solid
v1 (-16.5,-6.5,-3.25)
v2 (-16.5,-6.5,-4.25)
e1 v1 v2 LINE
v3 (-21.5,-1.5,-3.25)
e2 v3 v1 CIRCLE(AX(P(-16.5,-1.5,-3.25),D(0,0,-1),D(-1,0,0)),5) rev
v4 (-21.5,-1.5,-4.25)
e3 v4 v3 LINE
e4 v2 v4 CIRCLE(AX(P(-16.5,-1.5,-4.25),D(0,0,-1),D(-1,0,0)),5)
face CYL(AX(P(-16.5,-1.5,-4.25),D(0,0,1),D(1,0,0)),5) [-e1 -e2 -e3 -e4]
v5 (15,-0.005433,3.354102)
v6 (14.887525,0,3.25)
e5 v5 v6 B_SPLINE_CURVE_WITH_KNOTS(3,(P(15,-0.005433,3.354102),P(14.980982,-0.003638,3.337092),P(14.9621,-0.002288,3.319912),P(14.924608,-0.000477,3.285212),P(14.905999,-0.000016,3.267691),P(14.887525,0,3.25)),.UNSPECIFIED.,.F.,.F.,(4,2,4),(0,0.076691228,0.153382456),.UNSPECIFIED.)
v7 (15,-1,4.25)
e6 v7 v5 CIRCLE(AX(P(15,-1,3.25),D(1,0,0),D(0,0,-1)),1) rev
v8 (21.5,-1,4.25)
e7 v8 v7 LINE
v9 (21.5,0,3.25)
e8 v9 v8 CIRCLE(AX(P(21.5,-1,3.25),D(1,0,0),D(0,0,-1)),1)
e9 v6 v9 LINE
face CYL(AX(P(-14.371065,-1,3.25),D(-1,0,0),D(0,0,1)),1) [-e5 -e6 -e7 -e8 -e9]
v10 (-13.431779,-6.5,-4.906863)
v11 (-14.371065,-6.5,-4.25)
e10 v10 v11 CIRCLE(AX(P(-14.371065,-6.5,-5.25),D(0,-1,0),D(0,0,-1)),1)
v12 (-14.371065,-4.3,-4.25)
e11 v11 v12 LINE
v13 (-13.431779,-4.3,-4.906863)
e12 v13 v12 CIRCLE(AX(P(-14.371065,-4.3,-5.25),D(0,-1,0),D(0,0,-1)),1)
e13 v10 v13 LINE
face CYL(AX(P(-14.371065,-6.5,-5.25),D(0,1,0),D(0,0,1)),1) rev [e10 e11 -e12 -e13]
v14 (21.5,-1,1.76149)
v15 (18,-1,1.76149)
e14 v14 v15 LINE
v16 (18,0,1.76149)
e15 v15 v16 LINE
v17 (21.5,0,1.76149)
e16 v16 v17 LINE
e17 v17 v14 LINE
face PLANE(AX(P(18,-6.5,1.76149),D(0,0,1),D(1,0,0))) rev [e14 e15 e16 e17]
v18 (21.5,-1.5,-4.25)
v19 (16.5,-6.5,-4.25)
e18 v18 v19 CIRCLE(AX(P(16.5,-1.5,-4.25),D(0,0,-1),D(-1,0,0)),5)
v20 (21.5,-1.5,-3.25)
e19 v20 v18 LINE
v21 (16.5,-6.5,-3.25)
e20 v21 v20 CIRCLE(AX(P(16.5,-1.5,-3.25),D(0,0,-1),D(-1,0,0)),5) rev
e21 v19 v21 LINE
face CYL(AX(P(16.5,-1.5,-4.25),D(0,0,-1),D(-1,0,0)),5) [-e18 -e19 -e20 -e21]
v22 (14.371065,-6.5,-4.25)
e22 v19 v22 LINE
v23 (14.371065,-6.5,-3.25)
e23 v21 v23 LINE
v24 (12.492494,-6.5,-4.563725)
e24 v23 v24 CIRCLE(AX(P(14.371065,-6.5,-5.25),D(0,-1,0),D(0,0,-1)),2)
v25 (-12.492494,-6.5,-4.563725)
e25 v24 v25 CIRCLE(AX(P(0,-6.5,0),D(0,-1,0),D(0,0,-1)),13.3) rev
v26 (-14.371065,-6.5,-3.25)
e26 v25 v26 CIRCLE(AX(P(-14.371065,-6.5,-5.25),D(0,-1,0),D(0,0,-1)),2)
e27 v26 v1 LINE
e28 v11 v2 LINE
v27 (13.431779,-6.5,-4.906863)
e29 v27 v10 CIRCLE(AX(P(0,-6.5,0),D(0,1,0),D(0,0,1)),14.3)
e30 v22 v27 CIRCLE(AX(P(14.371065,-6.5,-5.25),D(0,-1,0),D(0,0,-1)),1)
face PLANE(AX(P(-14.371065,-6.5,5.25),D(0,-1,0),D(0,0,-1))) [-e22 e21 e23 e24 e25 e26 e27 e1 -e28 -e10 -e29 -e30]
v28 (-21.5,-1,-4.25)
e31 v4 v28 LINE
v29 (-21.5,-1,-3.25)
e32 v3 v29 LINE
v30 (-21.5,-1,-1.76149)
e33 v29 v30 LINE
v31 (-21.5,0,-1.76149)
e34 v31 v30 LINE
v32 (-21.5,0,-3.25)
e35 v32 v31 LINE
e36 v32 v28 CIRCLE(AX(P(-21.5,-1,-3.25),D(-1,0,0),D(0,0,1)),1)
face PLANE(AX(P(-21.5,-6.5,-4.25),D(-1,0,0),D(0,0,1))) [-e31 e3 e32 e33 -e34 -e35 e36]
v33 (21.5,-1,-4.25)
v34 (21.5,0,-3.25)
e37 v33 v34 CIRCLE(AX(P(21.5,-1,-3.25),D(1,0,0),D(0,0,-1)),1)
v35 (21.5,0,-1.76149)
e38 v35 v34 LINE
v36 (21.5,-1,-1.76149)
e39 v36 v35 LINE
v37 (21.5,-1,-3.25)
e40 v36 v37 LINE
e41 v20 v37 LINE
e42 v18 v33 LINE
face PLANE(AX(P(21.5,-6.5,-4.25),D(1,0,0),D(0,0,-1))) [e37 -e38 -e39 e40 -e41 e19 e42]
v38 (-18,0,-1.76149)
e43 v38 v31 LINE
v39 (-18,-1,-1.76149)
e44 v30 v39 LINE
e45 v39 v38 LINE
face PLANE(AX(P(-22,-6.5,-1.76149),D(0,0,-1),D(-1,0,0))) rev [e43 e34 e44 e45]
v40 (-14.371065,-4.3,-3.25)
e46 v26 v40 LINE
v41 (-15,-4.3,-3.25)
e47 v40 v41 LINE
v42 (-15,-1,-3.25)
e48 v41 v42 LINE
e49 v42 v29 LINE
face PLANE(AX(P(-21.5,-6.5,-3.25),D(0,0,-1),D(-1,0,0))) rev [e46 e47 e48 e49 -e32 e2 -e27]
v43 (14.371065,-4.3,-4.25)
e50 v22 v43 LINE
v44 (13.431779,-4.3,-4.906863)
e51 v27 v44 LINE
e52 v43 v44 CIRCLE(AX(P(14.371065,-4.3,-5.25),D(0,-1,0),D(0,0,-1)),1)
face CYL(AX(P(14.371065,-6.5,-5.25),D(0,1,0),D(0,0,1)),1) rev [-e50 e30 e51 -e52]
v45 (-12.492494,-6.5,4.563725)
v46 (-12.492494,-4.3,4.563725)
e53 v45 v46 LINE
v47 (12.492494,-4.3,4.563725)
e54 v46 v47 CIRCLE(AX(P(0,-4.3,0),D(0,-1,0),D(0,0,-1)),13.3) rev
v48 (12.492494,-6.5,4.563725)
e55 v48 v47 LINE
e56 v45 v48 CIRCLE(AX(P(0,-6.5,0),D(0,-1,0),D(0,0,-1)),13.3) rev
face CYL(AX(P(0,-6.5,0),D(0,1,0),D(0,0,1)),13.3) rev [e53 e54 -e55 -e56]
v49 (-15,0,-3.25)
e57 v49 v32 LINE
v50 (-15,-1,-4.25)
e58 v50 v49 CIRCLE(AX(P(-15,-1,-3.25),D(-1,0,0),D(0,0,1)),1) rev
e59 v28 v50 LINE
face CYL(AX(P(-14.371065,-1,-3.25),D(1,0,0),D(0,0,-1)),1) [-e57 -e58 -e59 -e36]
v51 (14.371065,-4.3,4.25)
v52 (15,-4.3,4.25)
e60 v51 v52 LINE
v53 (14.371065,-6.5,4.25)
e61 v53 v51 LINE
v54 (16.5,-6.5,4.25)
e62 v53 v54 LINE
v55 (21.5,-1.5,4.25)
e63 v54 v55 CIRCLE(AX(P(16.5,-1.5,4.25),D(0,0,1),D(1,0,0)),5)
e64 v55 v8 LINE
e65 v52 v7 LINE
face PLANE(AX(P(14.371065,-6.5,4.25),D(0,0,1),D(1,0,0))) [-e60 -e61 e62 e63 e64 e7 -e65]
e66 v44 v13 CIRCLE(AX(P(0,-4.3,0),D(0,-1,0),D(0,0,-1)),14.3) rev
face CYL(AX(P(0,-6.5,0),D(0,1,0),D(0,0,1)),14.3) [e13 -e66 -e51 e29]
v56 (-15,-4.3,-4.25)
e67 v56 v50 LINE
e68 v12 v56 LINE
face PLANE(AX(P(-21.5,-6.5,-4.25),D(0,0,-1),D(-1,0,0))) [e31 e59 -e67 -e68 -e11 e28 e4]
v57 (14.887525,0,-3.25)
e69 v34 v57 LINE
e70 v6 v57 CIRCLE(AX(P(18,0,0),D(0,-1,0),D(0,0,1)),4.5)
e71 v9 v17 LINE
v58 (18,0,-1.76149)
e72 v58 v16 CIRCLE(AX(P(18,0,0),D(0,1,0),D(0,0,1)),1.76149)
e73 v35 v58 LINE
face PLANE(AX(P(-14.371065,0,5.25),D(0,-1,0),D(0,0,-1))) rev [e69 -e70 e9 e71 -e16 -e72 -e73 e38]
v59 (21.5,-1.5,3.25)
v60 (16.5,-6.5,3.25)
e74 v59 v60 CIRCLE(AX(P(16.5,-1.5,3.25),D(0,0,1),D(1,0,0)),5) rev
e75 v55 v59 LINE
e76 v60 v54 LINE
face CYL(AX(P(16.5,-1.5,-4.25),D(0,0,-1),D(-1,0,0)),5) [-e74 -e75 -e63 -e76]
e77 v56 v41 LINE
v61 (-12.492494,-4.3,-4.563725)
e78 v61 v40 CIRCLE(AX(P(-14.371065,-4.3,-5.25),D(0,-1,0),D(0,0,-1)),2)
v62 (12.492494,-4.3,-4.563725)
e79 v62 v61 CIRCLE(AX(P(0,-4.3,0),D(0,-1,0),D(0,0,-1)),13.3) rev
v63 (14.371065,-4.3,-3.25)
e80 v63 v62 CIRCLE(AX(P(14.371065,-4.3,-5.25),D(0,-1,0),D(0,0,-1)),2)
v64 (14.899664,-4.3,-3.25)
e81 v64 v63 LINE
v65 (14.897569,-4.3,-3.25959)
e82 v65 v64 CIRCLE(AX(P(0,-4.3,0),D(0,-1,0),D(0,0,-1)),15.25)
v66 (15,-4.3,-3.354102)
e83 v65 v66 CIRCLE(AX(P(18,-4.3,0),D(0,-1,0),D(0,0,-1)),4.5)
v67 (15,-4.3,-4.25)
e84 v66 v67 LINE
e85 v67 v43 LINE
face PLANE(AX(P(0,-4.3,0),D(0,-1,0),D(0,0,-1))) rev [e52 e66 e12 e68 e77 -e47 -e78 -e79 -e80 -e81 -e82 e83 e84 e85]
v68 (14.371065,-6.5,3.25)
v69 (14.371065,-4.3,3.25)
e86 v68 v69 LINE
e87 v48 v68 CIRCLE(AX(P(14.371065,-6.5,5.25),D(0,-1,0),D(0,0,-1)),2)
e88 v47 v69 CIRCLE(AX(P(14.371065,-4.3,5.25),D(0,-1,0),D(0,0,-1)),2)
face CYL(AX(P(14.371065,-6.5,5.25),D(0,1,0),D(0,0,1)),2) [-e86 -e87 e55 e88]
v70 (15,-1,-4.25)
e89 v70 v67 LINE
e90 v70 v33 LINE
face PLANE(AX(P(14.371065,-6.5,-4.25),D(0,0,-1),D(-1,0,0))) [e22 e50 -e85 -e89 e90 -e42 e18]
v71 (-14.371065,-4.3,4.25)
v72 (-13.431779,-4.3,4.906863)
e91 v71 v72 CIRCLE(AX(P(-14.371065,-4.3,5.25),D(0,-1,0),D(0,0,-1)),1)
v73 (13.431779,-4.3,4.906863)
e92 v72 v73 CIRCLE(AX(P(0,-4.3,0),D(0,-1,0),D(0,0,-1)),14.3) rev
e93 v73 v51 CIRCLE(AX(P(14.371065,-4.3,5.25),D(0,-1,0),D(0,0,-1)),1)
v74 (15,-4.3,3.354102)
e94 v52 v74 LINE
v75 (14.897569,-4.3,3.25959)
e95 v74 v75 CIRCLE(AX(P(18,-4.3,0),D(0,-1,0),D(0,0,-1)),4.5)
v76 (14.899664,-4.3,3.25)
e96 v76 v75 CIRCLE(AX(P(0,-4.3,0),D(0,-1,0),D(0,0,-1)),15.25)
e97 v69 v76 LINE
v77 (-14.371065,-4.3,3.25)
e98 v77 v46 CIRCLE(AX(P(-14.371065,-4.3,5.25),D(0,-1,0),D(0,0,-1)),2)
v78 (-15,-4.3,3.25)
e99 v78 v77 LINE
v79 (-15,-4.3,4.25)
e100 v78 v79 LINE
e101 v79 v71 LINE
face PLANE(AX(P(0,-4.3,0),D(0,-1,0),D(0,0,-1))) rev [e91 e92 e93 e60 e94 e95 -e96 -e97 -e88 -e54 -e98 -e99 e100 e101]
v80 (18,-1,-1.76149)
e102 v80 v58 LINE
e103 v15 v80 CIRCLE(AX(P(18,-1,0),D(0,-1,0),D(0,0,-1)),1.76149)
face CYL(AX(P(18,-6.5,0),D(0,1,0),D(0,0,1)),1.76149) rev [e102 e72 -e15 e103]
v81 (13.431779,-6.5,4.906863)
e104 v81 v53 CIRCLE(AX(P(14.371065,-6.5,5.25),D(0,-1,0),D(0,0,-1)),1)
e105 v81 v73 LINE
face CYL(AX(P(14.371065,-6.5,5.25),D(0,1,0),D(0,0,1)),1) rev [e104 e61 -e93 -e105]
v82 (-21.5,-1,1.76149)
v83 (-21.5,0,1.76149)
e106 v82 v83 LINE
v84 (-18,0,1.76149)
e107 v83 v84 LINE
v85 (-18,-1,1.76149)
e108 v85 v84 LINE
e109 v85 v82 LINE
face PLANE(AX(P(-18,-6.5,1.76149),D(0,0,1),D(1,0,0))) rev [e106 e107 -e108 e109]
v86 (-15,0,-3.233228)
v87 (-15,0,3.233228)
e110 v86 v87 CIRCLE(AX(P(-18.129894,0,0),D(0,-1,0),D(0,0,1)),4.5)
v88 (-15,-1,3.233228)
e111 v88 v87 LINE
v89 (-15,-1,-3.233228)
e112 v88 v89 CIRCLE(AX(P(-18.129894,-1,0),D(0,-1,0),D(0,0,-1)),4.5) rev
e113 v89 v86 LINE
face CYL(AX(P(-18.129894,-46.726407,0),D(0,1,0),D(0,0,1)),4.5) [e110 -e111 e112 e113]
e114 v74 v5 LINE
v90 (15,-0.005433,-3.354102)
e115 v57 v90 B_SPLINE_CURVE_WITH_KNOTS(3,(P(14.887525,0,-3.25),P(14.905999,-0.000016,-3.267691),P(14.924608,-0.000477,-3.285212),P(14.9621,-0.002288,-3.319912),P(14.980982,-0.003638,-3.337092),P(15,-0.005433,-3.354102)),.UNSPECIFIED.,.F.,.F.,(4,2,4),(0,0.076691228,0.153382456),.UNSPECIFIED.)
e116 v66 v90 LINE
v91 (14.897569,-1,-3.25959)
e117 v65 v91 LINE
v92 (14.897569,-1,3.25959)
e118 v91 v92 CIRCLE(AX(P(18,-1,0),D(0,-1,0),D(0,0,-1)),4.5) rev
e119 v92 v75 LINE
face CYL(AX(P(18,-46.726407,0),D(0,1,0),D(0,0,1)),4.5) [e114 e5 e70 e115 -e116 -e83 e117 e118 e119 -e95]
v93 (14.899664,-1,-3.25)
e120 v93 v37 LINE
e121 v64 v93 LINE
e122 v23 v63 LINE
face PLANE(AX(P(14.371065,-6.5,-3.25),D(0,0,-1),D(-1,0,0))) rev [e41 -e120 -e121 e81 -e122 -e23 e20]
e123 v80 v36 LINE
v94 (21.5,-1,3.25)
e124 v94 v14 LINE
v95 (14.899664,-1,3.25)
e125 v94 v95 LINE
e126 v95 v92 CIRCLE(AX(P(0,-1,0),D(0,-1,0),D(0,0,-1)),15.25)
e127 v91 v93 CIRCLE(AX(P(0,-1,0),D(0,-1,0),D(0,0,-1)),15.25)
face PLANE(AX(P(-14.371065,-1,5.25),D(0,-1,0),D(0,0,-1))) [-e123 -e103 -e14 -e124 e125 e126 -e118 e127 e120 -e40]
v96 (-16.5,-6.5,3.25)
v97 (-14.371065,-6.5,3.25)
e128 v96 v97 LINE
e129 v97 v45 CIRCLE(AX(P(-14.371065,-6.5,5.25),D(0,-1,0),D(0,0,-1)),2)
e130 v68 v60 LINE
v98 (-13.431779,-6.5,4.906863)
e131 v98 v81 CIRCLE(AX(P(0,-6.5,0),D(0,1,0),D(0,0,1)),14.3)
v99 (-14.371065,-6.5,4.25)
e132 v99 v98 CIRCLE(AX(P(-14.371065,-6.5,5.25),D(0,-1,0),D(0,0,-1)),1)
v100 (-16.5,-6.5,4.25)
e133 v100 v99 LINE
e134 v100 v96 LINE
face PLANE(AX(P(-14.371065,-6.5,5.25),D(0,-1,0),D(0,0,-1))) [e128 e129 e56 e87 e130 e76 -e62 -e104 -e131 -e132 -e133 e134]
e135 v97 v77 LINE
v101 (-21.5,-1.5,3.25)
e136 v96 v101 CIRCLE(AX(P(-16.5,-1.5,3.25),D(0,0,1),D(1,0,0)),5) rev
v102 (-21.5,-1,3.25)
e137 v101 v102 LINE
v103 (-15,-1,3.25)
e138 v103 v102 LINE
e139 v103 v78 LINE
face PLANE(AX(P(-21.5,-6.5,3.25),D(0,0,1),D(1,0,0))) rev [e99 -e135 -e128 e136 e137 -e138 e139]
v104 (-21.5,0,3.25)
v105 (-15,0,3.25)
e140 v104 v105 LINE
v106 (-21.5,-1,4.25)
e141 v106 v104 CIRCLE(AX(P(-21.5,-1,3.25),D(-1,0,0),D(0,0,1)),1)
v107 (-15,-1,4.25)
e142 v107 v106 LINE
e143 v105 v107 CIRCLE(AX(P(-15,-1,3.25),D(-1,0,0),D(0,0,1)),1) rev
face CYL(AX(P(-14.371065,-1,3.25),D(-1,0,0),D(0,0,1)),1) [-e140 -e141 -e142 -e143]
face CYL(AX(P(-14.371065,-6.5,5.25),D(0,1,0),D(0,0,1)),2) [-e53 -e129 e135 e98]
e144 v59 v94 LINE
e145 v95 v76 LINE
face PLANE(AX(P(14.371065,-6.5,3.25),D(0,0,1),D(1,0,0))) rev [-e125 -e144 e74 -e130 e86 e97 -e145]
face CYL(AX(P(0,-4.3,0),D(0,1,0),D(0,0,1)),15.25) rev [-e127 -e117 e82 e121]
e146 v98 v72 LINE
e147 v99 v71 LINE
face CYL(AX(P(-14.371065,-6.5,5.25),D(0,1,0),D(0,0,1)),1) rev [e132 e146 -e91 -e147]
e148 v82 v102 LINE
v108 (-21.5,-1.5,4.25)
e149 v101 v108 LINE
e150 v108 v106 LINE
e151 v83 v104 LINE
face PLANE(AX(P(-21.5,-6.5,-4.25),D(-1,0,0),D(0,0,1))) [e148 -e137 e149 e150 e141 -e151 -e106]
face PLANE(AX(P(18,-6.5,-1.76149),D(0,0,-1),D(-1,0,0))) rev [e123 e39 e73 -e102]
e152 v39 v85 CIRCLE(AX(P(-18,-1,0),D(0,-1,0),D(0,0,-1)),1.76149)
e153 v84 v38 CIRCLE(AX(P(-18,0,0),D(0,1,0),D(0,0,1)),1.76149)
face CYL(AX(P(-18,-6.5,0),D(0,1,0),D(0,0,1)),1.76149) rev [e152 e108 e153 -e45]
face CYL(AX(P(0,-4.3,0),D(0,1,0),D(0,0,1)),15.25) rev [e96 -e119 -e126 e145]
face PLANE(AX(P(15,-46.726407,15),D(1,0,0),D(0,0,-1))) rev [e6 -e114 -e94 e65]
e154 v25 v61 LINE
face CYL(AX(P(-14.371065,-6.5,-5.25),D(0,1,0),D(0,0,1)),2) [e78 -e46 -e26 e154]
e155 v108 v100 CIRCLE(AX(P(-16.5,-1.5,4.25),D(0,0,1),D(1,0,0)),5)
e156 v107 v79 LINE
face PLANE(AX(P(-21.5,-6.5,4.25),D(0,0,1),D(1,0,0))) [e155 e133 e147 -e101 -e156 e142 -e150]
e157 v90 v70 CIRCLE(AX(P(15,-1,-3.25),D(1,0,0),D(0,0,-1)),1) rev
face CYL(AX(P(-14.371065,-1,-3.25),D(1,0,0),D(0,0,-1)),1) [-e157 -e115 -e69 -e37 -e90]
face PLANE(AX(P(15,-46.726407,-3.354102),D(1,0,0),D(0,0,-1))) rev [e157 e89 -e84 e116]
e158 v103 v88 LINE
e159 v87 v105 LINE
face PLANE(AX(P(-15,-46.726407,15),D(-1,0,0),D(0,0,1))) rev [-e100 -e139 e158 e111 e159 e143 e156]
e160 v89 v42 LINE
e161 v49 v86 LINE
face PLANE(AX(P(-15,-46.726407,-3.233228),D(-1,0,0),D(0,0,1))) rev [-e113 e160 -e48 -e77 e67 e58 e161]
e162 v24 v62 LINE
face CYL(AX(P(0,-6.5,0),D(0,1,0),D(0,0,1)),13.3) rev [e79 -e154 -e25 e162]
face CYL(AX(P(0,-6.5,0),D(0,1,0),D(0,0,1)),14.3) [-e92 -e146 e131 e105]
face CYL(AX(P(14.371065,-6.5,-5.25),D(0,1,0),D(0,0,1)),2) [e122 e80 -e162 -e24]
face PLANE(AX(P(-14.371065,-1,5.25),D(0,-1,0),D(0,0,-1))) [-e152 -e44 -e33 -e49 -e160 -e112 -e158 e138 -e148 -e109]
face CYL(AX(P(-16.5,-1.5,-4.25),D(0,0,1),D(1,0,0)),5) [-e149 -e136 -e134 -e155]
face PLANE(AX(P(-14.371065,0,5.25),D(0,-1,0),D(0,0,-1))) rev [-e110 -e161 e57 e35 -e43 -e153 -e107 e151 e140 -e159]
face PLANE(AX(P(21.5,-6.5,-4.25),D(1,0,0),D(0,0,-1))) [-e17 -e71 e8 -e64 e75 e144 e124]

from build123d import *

# Parameters (mm, degrees)
EXTRUDE1_DEPTH = 6.5
FILLET1_R      = 1
SHELL2_START   = -6.5
SHELL2_DEPTH   = 5.5
SKETCH2_R      = 15.25
EXTRUDE2_DEPTH = 3.3
EXTRUDE3_DEPTH = 27.626866185
EXTRUDE4_START = -4.3
EXTRUDE4_DEPTH = 4.3
FILLET2_R      = 5


# Read off the part's stored shape, not the designer's step: Shell2
with BuildPart() as part:
    # Sketch1 → Extrude1 (new body)
    with BuildSketch(Plane(origin=(0, 0, 0), x_dir=(1, 0, 0), z_dir=(0, 1, 0))):
        with BuildLine():
            Line((-21.5, 4.25), (-14.371064679, 4.25))
            ThreePointArc((-14.371064679, 4.25), (-13.797975355, 4.430507091), (-13.431779406, 4.906862745))
            ThreePointArc((-13.431779406, 4.906862745), (0, 14.3), (13.431779406, 4.906862745))
            ThreePointArc((13.431779406, 4.906862745), (13.797975355, 4.430507091), (14.371064679, 4.25))
            Line((14.371064679, 4.25), (21.5, 4.25))
            Line((21.5, 4.25), (21.5, -4.25))
            Line((21.5, -4.25), (14.371064679, -4.25))
            ThreePointArc((14.371064679, -4.25), (13.797975355, -4.430507091), (13.431779406, -4.906862745))
            ThreePointArc((13.431779406, -4.906862745), (0, -14.3), (-13.431779406, -4.906862745))
            ThreePointArc((-13.431779406, -4.906862745), (-13.797975355, -4.430507091), (-14.371064679, -4.25))
            Line((-14.371064679, -4.25), (-21.5, -4.25))
            Line((-21.5, -4.25), (-21.5, 4.25))
        make_face()
    extrude(amount=-EXTRUDE1_DEPTH)

    # Fillet1
    fillet1_edges = [part.edges().sort_by_distance(p)[0] for p in [
        (-17.935532339, 0, -4.25),
        (-13.797975355, 0, -4.430507091),
        (0, 0, -14.3),
        (13.797975355, 0, -4.430507091),
        (17.935532339, 0, -4.25),
        (17.935532339, 0, 4.25),
        (13.797975355, 0, 4.430507091),
        (0, 0, 14.3),
        (-13.797975355, 0, 4.430507091),
        (-17.935532339, 0, 4.25),
    ]]
    fillet(fillet1_edges, radius=FILLET1_R)

    # Shell2 outline → Shell2 (cut)
    with BuildSketch(Plane(origin=(0, 0, 0), x_dir=(1, 0, 0), z_dir=(0, 1, 0)).offset(SHELL2_START)):
        with BuildLine():
            ThreePointArc((-12.492494132, 4.56372549), (-13.224886032, 3.611014183), (-14.371064679, 3.25))
            Line((-14.371064679, 3.25), (-21.5, 3.25))
            Line((-21.5, 3.25), (-21.5, -3.25))
            Line((-21.5, -3.25), (-14.371064679, -3.25))
            ThreePointArc((-14.371064679, -3.25), (-13.224886032, -3.611014183), (-12.492494132, -4.56372549))
            ThreePointArc((-12.492494132, -4.56372549), (0, -13.3), (12.492494132, -4.56372549))
            ThreePointArc((12.492494132, -4.56372549), (13.224886032, -3.611014183), (14.371064679, -3.25))
            Line((14.371064679, -3.25), (21.5, -3.25))
            Line((21.5, -3.25), (21.5, 3.25))
            Line((21.5, 3.25), (14.371064679, 3.25))
            ThreePointArc((14.371064679, 3.25), (13.224886032, 3.611014183), (12.492494132, 4.56372549))
            ThreePointArc((12.492494132, 4.56372549), (0, 13.3), (-12.492494132, 4.56372549))
        make_face()
    extrude(amount=SHELL2_DEPTH, mode=Mode.SUBTRACT)

    # Sketch2 → Extrude2 (cut)
    with BuildSketch(Plane.XZ.offset(1)):
        Circle(SKETCH2_R)
    extrude(amount=EXTRUDE2_DEPTH, mode=Mode.SUBTRACT)

    # Sketch4 → Extrude3 (cut, through all)
    with BuildSketch(Plane(origin=(0, 0, 0), x_dir=(1, 0, 0), z_dir=(0, 1, 0))):
        with BuildLine():
            Line((18, 1.761490195), (22, 1.761490195))
            Line((22, 1.761490195), (22, -1.761490195))
            Line((22, -1.761490195), (18, -1.761490195))
            ThreePointArc((18, -1.761490195), (16.238509805, 0), (18, 1.761490195))
        make_face()
        with BuildLine():
            Line((-18, -1.761490195), (-22, -1.761490195))
            Line((-22, -1.761490195), (-22, 1.761490195))
            Line((-22, 1.761490195), (-18, 1.761490195))
            ThreePointArc((-18, 1.761490195), (-16.238509805, 0), (-18, -1.761490195))
        make_face()
    extrude(amount=-EXTRUDE3_DEPTH, mode=Mode.SUBTRACT)

    # Sketch5 → Extrude4 (cut)
    with BuildSketch(Plane(origin=(0, 0, 0), x_dir=(1, 0, 0), z_dir=(0, 1, 0)).offset(EXTRUDE4_START)):
        with BuildLine():
            Line((15, -15), (-15, -15))
            Line((-15, -15), (-15, -3.233227979))
            ThreePointArc((-15, -3.233227979), (-13.629894061, 0), (-15, 3.233227979))
            Line((-15, 3.233227979), (-15, 15))
            Line((-15, 15), (15, 15))
            Line((15, 15), (15, 3.354101966))
            ThreePointArc((15, 3.354101966), (13.5, 0), (15, -3.354101966))
            Line((15, -3.354101966), (15, -15))
        make_face()
    extrude(amount=EXTRUDE4_DEPTH, mode=Mode.SUBTRACT)

    # Fillet2
    fillet2_edges = [part.edges().sort_by_distance(p)[0] for p in [
        (21.5, -6.5, 3.75),
        (-21.5, -6.5, -3.75),
        (-21.5, -6.5, 3.75),
        (21.5, -6.5, -3.75),
    ]]
    fillet(fillet2_edges, radius=FILLET2_R)


solid = part.part
